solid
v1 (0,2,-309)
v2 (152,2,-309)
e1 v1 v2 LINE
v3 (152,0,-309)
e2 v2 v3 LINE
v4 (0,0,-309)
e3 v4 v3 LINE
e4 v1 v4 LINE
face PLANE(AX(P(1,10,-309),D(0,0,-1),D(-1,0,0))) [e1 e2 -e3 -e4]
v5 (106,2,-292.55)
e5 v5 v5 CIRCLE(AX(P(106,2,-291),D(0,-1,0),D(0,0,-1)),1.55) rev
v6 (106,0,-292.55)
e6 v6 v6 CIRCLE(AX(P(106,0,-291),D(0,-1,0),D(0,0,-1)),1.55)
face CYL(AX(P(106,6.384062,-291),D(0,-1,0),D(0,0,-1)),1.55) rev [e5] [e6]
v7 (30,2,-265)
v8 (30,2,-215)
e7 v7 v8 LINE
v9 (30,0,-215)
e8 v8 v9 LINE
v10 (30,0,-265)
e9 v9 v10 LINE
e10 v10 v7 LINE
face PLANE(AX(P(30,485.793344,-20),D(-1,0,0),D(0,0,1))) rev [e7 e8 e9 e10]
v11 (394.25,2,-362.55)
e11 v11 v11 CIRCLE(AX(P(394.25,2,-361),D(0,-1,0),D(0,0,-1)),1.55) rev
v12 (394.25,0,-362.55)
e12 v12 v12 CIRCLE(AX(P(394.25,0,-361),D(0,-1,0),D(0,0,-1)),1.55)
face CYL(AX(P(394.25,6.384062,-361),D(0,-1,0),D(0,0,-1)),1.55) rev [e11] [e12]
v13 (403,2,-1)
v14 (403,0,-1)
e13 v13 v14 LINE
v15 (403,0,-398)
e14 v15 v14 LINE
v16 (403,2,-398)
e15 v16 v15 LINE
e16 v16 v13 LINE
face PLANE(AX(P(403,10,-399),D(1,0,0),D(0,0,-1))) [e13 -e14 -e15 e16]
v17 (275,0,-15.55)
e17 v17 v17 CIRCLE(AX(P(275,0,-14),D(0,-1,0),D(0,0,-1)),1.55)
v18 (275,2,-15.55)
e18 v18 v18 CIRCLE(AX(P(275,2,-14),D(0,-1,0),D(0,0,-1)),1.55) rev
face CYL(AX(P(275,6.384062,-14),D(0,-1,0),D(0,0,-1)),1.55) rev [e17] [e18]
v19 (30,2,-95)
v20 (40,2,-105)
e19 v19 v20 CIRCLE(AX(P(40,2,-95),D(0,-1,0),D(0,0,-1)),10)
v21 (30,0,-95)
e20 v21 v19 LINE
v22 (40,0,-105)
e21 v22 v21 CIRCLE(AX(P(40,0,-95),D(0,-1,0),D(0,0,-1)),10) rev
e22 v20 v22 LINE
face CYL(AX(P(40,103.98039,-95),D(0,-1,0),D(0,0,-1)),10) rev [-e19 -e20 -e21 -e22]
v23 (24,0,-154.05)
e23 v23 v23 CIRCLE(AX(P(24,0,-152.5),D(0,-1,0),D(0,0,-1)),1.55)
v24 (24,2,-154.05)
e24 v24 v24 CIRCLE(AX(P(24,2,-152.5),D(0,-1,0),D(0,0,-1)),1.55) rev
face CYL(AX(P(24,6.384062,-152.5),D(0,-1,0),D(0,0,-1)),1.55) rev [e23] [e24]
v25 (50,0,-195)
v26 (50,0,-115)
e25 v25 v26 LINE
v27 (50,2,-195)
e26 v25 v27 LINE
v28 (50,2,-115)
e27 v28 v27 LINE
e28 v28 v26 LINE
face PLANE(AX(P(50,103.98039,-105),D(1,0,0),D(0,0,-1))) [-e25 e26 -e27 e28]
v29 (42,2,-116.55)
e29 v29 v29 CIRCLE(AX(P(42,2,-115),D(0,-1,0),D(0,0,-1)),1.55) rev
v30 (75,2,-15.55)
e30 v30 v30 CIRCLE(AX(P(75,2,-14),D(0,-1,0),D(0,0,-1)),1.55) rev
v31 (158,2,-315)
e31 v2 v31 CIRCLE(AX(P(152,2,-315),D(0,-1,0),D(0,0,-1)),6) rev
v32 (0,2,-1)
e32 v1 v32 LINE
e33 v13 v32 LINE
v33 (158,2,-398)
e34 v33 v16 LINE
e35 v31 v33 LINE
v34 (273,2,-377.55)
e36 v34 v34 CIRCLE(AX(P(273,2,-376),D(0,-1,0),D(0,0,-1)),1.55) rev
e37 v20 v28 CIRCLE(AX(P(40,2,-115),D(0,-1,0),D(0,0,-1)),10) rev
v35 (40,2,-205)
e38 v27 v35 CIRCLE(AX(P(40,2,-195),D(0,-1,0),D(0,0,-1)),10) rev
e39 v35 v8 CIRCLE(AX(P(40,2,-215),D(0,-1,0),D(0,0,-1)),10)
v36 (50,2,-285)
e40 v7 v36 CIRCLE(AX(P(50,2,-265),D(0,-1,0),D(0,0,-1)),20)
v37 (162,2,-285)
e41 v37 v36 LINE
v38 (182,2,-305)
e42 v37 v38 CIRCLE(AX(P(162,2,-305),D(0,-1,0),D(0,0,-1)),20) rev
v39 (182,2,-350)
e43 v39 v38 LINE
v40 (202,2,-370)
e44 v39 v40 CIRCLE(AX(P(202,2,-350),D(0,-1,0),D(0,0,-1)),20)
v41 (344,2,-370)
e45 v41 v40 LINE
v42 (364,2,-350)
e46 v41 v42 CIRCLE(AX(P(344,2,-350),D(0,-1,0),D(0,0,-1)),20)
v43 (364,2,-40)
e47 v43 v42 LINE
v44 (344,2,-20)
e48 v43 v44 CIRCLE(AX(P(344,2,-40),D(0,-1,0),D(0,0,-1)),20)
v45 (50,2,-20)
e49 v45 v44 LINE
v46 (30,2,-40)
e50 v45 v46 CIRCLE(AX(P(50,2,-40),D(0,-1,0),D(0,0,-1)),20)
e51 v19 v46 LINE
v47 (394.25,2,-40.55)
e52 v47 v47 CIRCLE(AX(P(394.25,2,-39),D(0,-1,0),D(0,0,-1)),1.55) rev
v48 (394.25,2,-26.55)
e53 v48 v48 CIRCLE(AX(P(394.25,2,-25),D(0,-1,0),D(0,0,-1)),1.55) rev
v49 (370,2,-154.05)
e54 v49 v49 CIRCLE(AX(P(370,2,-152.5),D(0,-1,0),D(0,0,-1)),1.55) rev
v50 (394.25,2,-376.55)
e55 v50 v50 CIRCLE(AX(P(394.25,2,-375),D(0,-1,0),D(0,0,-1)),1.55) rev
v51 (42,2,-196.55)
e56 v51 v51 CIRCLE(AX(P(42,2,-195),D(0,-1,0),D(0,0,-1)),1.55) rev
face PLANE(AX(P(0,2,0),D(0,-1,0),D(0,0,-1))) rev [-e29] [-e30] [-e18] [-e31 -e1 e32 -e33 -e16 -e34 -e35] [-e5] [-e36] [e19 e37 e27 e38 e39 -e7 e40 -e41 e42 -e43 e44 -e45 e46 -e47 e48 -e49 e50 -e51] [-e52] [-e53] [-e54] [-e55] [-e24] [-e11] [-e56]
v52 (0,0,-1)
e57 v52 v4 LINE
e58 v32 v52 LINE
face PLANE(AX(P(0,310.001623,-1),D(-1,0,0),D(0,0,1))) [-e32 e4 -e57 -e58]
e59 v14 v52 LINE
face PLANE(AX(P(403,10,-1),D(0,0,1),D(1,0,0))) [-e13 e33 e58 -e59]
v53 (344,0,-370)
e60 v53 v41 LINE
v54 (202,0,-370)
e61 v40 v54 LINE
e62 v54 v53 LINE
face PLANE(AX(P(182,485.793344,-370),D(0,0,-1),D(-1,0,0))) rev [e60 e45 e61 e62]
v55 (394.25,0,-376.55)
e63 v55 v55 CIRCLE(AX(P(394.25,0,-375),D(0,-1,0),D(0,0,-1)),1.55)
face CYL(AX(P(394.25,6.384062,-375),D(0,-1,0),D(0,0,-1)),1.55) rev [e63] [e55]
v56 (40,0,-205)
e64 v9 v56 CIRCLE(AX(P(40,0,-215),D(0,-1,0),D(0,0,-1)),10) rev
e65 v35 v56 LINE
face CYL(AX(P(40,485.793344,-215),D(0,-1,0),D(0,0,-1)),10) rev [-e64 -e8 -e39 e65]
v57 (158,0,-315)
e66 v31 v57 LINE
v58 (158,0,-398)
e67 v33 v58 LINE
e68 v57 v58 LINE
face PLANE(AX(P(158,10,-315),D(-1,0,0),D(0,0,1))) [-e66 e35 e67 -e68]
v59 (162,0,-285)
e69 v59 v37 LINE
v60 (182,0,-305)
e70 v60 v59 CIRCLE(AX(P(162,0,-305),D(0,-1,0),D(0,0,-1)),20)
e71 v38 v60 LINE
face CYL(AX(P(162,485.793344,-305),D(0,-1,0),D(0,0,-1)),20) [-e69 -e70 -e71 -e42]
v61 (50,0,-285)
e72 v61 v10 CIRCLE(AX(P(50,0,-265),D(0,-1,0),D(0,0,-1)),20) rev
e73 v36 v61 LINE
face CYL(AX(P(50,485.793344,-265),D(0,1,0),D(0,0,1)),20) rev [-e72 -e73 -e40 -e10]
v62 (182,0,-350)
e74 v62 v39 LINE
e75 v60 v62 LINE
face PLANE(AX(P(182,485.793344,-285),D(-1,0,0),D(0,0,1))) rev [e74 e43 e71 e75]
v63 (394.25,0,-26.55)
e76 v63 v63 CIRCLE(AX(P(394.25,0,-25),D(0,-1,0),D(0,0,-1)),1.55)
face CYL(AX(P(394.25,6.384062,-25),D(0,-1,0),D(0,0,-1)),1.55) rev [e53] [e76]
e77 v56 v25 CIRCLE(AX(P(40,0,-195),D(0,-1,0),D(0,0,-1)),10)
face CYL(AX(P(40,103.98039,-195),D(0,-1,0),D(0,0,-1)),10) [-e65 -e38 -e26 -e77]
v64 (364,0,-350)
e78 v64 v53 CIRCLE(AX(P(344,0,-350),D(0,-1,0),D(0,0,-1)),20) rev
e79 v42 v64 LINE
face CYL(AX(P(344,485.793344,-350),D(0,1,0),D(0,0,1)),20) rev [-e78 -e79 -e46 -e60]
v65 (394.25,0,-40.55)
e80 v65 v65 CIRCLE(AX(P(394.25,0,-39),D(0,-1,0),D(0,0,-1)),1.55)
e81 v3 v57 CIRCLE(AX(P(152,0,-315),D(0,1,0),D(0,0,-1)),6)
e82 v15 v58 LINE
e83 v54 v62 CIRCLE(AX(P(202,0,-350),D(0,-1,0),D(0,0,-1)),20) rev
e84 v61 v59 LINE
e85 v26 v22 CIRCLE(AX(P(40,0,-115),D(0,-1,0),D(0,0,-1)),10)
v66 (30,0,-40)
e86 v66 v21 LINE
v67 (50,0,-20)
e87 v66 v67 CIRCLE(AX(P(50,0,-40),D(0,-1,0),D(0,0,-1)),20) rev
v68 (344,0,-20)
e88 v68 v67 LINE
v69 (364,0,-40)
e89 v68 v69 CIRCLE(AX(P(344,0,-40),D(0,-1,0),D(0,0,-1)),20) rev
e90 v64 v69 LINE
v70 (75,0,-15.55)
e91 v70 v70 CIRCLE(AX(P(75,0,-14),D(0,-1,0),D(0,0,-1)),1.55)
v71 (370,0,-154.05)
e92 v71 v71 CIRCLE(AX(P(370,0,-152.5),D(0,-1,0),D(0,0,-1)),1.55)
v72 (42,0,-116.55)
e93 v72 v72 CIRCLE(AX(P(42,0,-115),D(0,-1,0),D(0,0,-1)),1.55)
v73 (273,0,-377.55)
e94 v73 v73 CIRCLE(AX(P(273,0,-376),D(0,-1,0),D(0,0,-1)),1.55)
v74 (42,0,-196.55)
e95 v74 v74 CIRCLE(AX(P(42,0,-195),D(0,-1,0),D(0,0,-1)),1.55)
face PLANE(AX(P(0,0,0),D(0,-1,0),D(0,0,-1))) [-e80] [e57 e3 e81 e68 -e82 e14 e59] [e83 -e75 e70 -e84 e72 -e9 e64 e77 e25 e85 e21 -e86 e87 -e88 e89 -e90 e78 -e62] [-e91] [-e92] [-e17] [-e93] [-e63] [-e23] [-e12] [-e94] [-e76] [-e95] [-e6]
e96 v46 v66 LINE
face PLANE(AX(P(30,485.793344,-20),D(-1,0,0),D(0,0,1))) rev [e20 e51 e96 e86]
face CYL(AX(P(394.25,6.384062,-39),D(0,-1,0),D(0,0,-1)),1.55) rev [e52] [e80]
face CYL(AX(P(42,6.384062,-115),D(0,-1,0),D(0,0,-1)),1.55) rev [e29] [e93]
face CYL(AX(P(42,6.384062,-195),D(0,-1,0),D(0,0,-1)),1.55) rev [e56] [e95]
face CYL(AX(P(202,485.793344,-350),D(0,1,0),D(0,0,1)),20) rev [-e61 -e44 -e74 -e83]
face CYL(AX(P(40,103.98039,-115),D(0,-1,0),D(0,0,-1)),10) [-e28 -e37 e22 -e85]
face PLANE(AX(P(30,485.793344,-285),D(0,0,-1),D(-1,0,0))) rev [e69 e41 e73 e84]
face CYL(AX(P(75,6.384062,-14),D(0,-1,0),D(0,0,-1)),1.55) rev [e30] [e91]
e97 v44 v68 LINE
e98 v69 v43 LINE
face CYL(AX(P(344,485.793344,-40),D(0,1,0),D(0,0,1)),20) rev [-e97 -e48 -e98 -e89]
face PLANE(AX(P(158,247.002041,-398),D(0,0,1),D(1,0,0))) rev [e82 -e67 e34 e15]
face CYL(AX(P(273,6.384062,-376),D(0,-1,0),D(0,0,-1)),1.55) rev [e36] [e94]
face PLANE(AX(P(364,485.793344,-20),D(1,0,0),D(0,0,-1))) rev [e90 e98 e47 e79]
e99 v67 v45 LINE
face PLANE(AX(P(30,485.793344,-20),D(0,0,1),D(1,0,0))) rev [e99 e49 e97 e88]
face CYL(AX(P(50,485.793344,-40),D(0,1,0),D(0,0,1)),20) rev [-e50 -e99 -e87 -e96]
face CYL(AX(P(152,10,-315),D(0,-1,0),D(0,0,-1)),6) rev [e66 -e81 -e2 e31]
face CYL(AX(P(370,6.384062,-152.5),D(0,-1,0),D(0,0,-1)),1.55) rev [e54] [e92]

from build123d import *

# Parameters (mm, degrees)
CROQUIS1_W              = 404
CROQUIS1_H              = 400
SALIENTE_EXTRUIR1_DEPTH = 2
CROQUIS3_W              = 157
CROQUIS3_H              = 90
CORTAR_EXTRUIR2_DEPTH   = 2
REDONDEO1_R             = 5
CORTAR_EXTRUIR3_DEPTH   = 2
REDONDEO2_R             = 20
CROQUIS6_R              = 1.55
CORTAR_EXTRUIR5_DEPTH   = 2
CROQUIS7_R              = 1.55
CORTAR_EXTRUIR6_DEPTH   = 2
CROQUIS8_W              = 20
CROQUIS8_H              = 100
SALIENTE_EXTRUIR2_DEPTH = 2
REDONDEO3_R             = 10
CROQUIS9_R              = 1.55
CORTAR_EXTRUIR7_DEPTH   = 2
CROQUIS10_OUTSIDE_W     = 519.704
CROQUIS10_OUTSIDE_H     = 515.704
CORTAR_EXTRUIR8_DEPTH   = 10
CROQUIS11_W             = 245
CROQUIS11_H             = 1
CORTAR_EXTRUIR9_DEPTH   = 2
CROQUIS12_W             = 1
CROQUIS12_H             = 308
SALIENTE_EXTRUIR3_DEPTH = 2


with BuildPart() as part:
    # Croquis1 → Saliente-Extruir1 (new body)
    with BuildSketch(Plane(origin=(0, 0, 0), x_dir=(1, 0, 0), z_dir=(0, 1, 0))):
        with Locations((202, 200)):
            Rectangle(CROQUIS1_W, CROQUIS1_H)
    extrude(amount=SALIENTE_EXTRUIR1_DEPTH)

    # Croquis3 → Cortar-Extruir2 (cut)
    with BuildSketch(Plane.XZ):
        with Locations((78.5, -355)):
            Rectangle(CROQUIS3_W, CROQUIS3_H)
    extrude(amount=-CORTAR_EXTRUIR2_DEPTH, mode=Mode.SUBTRACT)

    # Redondeo1
    redondeo1_edges = [part.edges().sort_by_distance(p)[0] for p in [
        (157, 1, -310),
    ]]
    fillet(redondeo1_edges, radius=REDONDEO1_R)

    # Croquis4 → Cortar-Extruir3 (cut)
    with BuildSketch(Plane.XZ):
        Polygon((30, -20), (364, -20), (364, -233.661541009), (364, -370), (182, -370), (182, -285), (30, -285), align=None)
    extrude(amount=-CORTAR_EXTRUIR3_DEPTH, mode=Mode.SUBTRACT)

    # Redondeo2
    redondeo2_edges = [part.edges().sort_by_distance(p)[0] for p in [
        (30, 1, -285),
        (30, 1, -20),
        (364, 1, -20),
        (364, 1, -370),
        (182, 1, -370),
        (182, 1, -285),
    ]]
    fillet(redondeo2_edges, radius=REDONDEO2_R)

    # Croquis6 → Cortar-Extruir5 (cut)
    with BuildSketch(Plane.XZ):
        with Locations(Location((75, -14, 0), (0, 0, 270))):
            Circle(CROQUIS6_R)
        with Locations(Location((275, -14, 0), (0, 0, 270))):
            Circle(CROQUIS6_R)
        with Locations(Location((273, -376, 0), (0, 0, 270))):
            Circle(CROQUIS6_R)
        with Locations(Location((106, -291, 0), (0, 0, 270))):
            Circle(CROQUIS6_R)
        with Locations(Location((24, -152.5, 0), (0, 0, 270))):
            Circle(CROQUIS6_R)
        with Locations(Location((370, -152.5, 0), (0, 0, 270))):
            Circle(CROQUIS6_R)
    extrude(amount=-CORTAR_EXTRUIR5_DEPTH, mode=Mode.SUBTRACT)

    # Croquis7 → Cortar-Extruir6 (cut)
    with BuildSketch(Plane.XZ):
        with Locations(Location((394.25, -25, 0), (0, 0, 270))):
            Circle(CROQUIS7_R)
        with Locations(Location((394.25, -39, 0), (0, 0, 270))):
            Circle(CROQUIS7_R)
        with Locations(Location((394.25, -375, 0), (0, 0, 270))):
            Circle(CROQUIS7_R)
        with Locations(Location((394.25, -361, 0), (0, 0, 270))):
            Circle(CROQUIS7_R)
    extrude(amount=-CORTAR_EXTRUIR6_DEPTH, mode=Mode.SUBTRACT)

    # Croquis8 → Saliente-Extruir2 (add)
    with BuildSketch(Plane.XZ):
        with Locations((40, -155)):
            Rectangle(CROQUIS8_W, CROQUIS8_H)
    extrude(amount=-SALIENTE_EXTRUIR2_DEPTH)

    # Redondeo3
    redondeo3_edges = [part.edges().sort_by_distance(p)[0] for p in [
        (30, 1, -205),
        (30, 1, -105),
    ]]
    fillet(redondeo3_edges, radius=REDONDEO3_R)
    redondeo3_2_edges = [part.edges().sort_by_distance(p)[0] for p in [
        (50, 1, -205),
        (50, 1, -105),
    ]]
    fillet(redondeo3_2_edges, radius=REDONDEO3_R - 0.0001)  # a hair under: the kernel refuses the full size

    # Croquis9 → Cortar-Extruir7 (cut)
    with BuildSketch(Plane.XZ):
        with Locations(Location((42, -115, 0), (0, 0, 270))):
            Circle(CROQUIS9_R)
        with Locations(Location((42, -195, 0), (0, 0, 270))):
            Circle(CROQUIS9_R)
    extrude(amount=-CORTAR_EXTRUIR7_DEPTH, mode=Mode.SUBTRACT)

    # Croquis10 outside → Cortar-Extruir8 (cut)
    with BuildSketch(Plane.XZ):
        with Locations((202, -200)):
            Rectangle(CROQUIS10_OUTSIDE_W, CROQUIS10_OUTSIDE_H)
        with BuildLine():
            Line((1, -309), (152, -309))
            ThreePointArc((152, -309), (156.242640687, -310.757359313), (158, -315))
            Line((158, -315), (158, -399))
            Line((158, -399), (403, -399))
            Line((403, -399), (403, -1))
            Line((403, -1), (1, -1))
            Line((1, -1), (1, -309))
        make_face(mode=Mode.SUBTRACT)
    extrude(amount=-CORTAR_EXTRUIR8_DEPTH, mode=Mode.SUBTRACT)

    # Croquis11 → Cortar-Extruir9 (cut)
    with BuildSketch(Plane.XZ):
        with Locations((280.5, -398.5)):
            Rectangle(CROQUIS11_W, CROQUIS11_H)
    extrude(amount=-CORTAR_EXTRUIR9_DEPTH, mode=Mode.SUBTRACT)

    # Croquis12 → Saliente-Extruir3 (add)
    with BuildSketch(Plane.XZ):
        with Locations((0.5, -155)):
            Rectangle(CROQUIS12_W, CROQUIS12_H)
    extrude(amount=-SALIENTE_EXTRUIR3_DEPTH)


solid = part.part
